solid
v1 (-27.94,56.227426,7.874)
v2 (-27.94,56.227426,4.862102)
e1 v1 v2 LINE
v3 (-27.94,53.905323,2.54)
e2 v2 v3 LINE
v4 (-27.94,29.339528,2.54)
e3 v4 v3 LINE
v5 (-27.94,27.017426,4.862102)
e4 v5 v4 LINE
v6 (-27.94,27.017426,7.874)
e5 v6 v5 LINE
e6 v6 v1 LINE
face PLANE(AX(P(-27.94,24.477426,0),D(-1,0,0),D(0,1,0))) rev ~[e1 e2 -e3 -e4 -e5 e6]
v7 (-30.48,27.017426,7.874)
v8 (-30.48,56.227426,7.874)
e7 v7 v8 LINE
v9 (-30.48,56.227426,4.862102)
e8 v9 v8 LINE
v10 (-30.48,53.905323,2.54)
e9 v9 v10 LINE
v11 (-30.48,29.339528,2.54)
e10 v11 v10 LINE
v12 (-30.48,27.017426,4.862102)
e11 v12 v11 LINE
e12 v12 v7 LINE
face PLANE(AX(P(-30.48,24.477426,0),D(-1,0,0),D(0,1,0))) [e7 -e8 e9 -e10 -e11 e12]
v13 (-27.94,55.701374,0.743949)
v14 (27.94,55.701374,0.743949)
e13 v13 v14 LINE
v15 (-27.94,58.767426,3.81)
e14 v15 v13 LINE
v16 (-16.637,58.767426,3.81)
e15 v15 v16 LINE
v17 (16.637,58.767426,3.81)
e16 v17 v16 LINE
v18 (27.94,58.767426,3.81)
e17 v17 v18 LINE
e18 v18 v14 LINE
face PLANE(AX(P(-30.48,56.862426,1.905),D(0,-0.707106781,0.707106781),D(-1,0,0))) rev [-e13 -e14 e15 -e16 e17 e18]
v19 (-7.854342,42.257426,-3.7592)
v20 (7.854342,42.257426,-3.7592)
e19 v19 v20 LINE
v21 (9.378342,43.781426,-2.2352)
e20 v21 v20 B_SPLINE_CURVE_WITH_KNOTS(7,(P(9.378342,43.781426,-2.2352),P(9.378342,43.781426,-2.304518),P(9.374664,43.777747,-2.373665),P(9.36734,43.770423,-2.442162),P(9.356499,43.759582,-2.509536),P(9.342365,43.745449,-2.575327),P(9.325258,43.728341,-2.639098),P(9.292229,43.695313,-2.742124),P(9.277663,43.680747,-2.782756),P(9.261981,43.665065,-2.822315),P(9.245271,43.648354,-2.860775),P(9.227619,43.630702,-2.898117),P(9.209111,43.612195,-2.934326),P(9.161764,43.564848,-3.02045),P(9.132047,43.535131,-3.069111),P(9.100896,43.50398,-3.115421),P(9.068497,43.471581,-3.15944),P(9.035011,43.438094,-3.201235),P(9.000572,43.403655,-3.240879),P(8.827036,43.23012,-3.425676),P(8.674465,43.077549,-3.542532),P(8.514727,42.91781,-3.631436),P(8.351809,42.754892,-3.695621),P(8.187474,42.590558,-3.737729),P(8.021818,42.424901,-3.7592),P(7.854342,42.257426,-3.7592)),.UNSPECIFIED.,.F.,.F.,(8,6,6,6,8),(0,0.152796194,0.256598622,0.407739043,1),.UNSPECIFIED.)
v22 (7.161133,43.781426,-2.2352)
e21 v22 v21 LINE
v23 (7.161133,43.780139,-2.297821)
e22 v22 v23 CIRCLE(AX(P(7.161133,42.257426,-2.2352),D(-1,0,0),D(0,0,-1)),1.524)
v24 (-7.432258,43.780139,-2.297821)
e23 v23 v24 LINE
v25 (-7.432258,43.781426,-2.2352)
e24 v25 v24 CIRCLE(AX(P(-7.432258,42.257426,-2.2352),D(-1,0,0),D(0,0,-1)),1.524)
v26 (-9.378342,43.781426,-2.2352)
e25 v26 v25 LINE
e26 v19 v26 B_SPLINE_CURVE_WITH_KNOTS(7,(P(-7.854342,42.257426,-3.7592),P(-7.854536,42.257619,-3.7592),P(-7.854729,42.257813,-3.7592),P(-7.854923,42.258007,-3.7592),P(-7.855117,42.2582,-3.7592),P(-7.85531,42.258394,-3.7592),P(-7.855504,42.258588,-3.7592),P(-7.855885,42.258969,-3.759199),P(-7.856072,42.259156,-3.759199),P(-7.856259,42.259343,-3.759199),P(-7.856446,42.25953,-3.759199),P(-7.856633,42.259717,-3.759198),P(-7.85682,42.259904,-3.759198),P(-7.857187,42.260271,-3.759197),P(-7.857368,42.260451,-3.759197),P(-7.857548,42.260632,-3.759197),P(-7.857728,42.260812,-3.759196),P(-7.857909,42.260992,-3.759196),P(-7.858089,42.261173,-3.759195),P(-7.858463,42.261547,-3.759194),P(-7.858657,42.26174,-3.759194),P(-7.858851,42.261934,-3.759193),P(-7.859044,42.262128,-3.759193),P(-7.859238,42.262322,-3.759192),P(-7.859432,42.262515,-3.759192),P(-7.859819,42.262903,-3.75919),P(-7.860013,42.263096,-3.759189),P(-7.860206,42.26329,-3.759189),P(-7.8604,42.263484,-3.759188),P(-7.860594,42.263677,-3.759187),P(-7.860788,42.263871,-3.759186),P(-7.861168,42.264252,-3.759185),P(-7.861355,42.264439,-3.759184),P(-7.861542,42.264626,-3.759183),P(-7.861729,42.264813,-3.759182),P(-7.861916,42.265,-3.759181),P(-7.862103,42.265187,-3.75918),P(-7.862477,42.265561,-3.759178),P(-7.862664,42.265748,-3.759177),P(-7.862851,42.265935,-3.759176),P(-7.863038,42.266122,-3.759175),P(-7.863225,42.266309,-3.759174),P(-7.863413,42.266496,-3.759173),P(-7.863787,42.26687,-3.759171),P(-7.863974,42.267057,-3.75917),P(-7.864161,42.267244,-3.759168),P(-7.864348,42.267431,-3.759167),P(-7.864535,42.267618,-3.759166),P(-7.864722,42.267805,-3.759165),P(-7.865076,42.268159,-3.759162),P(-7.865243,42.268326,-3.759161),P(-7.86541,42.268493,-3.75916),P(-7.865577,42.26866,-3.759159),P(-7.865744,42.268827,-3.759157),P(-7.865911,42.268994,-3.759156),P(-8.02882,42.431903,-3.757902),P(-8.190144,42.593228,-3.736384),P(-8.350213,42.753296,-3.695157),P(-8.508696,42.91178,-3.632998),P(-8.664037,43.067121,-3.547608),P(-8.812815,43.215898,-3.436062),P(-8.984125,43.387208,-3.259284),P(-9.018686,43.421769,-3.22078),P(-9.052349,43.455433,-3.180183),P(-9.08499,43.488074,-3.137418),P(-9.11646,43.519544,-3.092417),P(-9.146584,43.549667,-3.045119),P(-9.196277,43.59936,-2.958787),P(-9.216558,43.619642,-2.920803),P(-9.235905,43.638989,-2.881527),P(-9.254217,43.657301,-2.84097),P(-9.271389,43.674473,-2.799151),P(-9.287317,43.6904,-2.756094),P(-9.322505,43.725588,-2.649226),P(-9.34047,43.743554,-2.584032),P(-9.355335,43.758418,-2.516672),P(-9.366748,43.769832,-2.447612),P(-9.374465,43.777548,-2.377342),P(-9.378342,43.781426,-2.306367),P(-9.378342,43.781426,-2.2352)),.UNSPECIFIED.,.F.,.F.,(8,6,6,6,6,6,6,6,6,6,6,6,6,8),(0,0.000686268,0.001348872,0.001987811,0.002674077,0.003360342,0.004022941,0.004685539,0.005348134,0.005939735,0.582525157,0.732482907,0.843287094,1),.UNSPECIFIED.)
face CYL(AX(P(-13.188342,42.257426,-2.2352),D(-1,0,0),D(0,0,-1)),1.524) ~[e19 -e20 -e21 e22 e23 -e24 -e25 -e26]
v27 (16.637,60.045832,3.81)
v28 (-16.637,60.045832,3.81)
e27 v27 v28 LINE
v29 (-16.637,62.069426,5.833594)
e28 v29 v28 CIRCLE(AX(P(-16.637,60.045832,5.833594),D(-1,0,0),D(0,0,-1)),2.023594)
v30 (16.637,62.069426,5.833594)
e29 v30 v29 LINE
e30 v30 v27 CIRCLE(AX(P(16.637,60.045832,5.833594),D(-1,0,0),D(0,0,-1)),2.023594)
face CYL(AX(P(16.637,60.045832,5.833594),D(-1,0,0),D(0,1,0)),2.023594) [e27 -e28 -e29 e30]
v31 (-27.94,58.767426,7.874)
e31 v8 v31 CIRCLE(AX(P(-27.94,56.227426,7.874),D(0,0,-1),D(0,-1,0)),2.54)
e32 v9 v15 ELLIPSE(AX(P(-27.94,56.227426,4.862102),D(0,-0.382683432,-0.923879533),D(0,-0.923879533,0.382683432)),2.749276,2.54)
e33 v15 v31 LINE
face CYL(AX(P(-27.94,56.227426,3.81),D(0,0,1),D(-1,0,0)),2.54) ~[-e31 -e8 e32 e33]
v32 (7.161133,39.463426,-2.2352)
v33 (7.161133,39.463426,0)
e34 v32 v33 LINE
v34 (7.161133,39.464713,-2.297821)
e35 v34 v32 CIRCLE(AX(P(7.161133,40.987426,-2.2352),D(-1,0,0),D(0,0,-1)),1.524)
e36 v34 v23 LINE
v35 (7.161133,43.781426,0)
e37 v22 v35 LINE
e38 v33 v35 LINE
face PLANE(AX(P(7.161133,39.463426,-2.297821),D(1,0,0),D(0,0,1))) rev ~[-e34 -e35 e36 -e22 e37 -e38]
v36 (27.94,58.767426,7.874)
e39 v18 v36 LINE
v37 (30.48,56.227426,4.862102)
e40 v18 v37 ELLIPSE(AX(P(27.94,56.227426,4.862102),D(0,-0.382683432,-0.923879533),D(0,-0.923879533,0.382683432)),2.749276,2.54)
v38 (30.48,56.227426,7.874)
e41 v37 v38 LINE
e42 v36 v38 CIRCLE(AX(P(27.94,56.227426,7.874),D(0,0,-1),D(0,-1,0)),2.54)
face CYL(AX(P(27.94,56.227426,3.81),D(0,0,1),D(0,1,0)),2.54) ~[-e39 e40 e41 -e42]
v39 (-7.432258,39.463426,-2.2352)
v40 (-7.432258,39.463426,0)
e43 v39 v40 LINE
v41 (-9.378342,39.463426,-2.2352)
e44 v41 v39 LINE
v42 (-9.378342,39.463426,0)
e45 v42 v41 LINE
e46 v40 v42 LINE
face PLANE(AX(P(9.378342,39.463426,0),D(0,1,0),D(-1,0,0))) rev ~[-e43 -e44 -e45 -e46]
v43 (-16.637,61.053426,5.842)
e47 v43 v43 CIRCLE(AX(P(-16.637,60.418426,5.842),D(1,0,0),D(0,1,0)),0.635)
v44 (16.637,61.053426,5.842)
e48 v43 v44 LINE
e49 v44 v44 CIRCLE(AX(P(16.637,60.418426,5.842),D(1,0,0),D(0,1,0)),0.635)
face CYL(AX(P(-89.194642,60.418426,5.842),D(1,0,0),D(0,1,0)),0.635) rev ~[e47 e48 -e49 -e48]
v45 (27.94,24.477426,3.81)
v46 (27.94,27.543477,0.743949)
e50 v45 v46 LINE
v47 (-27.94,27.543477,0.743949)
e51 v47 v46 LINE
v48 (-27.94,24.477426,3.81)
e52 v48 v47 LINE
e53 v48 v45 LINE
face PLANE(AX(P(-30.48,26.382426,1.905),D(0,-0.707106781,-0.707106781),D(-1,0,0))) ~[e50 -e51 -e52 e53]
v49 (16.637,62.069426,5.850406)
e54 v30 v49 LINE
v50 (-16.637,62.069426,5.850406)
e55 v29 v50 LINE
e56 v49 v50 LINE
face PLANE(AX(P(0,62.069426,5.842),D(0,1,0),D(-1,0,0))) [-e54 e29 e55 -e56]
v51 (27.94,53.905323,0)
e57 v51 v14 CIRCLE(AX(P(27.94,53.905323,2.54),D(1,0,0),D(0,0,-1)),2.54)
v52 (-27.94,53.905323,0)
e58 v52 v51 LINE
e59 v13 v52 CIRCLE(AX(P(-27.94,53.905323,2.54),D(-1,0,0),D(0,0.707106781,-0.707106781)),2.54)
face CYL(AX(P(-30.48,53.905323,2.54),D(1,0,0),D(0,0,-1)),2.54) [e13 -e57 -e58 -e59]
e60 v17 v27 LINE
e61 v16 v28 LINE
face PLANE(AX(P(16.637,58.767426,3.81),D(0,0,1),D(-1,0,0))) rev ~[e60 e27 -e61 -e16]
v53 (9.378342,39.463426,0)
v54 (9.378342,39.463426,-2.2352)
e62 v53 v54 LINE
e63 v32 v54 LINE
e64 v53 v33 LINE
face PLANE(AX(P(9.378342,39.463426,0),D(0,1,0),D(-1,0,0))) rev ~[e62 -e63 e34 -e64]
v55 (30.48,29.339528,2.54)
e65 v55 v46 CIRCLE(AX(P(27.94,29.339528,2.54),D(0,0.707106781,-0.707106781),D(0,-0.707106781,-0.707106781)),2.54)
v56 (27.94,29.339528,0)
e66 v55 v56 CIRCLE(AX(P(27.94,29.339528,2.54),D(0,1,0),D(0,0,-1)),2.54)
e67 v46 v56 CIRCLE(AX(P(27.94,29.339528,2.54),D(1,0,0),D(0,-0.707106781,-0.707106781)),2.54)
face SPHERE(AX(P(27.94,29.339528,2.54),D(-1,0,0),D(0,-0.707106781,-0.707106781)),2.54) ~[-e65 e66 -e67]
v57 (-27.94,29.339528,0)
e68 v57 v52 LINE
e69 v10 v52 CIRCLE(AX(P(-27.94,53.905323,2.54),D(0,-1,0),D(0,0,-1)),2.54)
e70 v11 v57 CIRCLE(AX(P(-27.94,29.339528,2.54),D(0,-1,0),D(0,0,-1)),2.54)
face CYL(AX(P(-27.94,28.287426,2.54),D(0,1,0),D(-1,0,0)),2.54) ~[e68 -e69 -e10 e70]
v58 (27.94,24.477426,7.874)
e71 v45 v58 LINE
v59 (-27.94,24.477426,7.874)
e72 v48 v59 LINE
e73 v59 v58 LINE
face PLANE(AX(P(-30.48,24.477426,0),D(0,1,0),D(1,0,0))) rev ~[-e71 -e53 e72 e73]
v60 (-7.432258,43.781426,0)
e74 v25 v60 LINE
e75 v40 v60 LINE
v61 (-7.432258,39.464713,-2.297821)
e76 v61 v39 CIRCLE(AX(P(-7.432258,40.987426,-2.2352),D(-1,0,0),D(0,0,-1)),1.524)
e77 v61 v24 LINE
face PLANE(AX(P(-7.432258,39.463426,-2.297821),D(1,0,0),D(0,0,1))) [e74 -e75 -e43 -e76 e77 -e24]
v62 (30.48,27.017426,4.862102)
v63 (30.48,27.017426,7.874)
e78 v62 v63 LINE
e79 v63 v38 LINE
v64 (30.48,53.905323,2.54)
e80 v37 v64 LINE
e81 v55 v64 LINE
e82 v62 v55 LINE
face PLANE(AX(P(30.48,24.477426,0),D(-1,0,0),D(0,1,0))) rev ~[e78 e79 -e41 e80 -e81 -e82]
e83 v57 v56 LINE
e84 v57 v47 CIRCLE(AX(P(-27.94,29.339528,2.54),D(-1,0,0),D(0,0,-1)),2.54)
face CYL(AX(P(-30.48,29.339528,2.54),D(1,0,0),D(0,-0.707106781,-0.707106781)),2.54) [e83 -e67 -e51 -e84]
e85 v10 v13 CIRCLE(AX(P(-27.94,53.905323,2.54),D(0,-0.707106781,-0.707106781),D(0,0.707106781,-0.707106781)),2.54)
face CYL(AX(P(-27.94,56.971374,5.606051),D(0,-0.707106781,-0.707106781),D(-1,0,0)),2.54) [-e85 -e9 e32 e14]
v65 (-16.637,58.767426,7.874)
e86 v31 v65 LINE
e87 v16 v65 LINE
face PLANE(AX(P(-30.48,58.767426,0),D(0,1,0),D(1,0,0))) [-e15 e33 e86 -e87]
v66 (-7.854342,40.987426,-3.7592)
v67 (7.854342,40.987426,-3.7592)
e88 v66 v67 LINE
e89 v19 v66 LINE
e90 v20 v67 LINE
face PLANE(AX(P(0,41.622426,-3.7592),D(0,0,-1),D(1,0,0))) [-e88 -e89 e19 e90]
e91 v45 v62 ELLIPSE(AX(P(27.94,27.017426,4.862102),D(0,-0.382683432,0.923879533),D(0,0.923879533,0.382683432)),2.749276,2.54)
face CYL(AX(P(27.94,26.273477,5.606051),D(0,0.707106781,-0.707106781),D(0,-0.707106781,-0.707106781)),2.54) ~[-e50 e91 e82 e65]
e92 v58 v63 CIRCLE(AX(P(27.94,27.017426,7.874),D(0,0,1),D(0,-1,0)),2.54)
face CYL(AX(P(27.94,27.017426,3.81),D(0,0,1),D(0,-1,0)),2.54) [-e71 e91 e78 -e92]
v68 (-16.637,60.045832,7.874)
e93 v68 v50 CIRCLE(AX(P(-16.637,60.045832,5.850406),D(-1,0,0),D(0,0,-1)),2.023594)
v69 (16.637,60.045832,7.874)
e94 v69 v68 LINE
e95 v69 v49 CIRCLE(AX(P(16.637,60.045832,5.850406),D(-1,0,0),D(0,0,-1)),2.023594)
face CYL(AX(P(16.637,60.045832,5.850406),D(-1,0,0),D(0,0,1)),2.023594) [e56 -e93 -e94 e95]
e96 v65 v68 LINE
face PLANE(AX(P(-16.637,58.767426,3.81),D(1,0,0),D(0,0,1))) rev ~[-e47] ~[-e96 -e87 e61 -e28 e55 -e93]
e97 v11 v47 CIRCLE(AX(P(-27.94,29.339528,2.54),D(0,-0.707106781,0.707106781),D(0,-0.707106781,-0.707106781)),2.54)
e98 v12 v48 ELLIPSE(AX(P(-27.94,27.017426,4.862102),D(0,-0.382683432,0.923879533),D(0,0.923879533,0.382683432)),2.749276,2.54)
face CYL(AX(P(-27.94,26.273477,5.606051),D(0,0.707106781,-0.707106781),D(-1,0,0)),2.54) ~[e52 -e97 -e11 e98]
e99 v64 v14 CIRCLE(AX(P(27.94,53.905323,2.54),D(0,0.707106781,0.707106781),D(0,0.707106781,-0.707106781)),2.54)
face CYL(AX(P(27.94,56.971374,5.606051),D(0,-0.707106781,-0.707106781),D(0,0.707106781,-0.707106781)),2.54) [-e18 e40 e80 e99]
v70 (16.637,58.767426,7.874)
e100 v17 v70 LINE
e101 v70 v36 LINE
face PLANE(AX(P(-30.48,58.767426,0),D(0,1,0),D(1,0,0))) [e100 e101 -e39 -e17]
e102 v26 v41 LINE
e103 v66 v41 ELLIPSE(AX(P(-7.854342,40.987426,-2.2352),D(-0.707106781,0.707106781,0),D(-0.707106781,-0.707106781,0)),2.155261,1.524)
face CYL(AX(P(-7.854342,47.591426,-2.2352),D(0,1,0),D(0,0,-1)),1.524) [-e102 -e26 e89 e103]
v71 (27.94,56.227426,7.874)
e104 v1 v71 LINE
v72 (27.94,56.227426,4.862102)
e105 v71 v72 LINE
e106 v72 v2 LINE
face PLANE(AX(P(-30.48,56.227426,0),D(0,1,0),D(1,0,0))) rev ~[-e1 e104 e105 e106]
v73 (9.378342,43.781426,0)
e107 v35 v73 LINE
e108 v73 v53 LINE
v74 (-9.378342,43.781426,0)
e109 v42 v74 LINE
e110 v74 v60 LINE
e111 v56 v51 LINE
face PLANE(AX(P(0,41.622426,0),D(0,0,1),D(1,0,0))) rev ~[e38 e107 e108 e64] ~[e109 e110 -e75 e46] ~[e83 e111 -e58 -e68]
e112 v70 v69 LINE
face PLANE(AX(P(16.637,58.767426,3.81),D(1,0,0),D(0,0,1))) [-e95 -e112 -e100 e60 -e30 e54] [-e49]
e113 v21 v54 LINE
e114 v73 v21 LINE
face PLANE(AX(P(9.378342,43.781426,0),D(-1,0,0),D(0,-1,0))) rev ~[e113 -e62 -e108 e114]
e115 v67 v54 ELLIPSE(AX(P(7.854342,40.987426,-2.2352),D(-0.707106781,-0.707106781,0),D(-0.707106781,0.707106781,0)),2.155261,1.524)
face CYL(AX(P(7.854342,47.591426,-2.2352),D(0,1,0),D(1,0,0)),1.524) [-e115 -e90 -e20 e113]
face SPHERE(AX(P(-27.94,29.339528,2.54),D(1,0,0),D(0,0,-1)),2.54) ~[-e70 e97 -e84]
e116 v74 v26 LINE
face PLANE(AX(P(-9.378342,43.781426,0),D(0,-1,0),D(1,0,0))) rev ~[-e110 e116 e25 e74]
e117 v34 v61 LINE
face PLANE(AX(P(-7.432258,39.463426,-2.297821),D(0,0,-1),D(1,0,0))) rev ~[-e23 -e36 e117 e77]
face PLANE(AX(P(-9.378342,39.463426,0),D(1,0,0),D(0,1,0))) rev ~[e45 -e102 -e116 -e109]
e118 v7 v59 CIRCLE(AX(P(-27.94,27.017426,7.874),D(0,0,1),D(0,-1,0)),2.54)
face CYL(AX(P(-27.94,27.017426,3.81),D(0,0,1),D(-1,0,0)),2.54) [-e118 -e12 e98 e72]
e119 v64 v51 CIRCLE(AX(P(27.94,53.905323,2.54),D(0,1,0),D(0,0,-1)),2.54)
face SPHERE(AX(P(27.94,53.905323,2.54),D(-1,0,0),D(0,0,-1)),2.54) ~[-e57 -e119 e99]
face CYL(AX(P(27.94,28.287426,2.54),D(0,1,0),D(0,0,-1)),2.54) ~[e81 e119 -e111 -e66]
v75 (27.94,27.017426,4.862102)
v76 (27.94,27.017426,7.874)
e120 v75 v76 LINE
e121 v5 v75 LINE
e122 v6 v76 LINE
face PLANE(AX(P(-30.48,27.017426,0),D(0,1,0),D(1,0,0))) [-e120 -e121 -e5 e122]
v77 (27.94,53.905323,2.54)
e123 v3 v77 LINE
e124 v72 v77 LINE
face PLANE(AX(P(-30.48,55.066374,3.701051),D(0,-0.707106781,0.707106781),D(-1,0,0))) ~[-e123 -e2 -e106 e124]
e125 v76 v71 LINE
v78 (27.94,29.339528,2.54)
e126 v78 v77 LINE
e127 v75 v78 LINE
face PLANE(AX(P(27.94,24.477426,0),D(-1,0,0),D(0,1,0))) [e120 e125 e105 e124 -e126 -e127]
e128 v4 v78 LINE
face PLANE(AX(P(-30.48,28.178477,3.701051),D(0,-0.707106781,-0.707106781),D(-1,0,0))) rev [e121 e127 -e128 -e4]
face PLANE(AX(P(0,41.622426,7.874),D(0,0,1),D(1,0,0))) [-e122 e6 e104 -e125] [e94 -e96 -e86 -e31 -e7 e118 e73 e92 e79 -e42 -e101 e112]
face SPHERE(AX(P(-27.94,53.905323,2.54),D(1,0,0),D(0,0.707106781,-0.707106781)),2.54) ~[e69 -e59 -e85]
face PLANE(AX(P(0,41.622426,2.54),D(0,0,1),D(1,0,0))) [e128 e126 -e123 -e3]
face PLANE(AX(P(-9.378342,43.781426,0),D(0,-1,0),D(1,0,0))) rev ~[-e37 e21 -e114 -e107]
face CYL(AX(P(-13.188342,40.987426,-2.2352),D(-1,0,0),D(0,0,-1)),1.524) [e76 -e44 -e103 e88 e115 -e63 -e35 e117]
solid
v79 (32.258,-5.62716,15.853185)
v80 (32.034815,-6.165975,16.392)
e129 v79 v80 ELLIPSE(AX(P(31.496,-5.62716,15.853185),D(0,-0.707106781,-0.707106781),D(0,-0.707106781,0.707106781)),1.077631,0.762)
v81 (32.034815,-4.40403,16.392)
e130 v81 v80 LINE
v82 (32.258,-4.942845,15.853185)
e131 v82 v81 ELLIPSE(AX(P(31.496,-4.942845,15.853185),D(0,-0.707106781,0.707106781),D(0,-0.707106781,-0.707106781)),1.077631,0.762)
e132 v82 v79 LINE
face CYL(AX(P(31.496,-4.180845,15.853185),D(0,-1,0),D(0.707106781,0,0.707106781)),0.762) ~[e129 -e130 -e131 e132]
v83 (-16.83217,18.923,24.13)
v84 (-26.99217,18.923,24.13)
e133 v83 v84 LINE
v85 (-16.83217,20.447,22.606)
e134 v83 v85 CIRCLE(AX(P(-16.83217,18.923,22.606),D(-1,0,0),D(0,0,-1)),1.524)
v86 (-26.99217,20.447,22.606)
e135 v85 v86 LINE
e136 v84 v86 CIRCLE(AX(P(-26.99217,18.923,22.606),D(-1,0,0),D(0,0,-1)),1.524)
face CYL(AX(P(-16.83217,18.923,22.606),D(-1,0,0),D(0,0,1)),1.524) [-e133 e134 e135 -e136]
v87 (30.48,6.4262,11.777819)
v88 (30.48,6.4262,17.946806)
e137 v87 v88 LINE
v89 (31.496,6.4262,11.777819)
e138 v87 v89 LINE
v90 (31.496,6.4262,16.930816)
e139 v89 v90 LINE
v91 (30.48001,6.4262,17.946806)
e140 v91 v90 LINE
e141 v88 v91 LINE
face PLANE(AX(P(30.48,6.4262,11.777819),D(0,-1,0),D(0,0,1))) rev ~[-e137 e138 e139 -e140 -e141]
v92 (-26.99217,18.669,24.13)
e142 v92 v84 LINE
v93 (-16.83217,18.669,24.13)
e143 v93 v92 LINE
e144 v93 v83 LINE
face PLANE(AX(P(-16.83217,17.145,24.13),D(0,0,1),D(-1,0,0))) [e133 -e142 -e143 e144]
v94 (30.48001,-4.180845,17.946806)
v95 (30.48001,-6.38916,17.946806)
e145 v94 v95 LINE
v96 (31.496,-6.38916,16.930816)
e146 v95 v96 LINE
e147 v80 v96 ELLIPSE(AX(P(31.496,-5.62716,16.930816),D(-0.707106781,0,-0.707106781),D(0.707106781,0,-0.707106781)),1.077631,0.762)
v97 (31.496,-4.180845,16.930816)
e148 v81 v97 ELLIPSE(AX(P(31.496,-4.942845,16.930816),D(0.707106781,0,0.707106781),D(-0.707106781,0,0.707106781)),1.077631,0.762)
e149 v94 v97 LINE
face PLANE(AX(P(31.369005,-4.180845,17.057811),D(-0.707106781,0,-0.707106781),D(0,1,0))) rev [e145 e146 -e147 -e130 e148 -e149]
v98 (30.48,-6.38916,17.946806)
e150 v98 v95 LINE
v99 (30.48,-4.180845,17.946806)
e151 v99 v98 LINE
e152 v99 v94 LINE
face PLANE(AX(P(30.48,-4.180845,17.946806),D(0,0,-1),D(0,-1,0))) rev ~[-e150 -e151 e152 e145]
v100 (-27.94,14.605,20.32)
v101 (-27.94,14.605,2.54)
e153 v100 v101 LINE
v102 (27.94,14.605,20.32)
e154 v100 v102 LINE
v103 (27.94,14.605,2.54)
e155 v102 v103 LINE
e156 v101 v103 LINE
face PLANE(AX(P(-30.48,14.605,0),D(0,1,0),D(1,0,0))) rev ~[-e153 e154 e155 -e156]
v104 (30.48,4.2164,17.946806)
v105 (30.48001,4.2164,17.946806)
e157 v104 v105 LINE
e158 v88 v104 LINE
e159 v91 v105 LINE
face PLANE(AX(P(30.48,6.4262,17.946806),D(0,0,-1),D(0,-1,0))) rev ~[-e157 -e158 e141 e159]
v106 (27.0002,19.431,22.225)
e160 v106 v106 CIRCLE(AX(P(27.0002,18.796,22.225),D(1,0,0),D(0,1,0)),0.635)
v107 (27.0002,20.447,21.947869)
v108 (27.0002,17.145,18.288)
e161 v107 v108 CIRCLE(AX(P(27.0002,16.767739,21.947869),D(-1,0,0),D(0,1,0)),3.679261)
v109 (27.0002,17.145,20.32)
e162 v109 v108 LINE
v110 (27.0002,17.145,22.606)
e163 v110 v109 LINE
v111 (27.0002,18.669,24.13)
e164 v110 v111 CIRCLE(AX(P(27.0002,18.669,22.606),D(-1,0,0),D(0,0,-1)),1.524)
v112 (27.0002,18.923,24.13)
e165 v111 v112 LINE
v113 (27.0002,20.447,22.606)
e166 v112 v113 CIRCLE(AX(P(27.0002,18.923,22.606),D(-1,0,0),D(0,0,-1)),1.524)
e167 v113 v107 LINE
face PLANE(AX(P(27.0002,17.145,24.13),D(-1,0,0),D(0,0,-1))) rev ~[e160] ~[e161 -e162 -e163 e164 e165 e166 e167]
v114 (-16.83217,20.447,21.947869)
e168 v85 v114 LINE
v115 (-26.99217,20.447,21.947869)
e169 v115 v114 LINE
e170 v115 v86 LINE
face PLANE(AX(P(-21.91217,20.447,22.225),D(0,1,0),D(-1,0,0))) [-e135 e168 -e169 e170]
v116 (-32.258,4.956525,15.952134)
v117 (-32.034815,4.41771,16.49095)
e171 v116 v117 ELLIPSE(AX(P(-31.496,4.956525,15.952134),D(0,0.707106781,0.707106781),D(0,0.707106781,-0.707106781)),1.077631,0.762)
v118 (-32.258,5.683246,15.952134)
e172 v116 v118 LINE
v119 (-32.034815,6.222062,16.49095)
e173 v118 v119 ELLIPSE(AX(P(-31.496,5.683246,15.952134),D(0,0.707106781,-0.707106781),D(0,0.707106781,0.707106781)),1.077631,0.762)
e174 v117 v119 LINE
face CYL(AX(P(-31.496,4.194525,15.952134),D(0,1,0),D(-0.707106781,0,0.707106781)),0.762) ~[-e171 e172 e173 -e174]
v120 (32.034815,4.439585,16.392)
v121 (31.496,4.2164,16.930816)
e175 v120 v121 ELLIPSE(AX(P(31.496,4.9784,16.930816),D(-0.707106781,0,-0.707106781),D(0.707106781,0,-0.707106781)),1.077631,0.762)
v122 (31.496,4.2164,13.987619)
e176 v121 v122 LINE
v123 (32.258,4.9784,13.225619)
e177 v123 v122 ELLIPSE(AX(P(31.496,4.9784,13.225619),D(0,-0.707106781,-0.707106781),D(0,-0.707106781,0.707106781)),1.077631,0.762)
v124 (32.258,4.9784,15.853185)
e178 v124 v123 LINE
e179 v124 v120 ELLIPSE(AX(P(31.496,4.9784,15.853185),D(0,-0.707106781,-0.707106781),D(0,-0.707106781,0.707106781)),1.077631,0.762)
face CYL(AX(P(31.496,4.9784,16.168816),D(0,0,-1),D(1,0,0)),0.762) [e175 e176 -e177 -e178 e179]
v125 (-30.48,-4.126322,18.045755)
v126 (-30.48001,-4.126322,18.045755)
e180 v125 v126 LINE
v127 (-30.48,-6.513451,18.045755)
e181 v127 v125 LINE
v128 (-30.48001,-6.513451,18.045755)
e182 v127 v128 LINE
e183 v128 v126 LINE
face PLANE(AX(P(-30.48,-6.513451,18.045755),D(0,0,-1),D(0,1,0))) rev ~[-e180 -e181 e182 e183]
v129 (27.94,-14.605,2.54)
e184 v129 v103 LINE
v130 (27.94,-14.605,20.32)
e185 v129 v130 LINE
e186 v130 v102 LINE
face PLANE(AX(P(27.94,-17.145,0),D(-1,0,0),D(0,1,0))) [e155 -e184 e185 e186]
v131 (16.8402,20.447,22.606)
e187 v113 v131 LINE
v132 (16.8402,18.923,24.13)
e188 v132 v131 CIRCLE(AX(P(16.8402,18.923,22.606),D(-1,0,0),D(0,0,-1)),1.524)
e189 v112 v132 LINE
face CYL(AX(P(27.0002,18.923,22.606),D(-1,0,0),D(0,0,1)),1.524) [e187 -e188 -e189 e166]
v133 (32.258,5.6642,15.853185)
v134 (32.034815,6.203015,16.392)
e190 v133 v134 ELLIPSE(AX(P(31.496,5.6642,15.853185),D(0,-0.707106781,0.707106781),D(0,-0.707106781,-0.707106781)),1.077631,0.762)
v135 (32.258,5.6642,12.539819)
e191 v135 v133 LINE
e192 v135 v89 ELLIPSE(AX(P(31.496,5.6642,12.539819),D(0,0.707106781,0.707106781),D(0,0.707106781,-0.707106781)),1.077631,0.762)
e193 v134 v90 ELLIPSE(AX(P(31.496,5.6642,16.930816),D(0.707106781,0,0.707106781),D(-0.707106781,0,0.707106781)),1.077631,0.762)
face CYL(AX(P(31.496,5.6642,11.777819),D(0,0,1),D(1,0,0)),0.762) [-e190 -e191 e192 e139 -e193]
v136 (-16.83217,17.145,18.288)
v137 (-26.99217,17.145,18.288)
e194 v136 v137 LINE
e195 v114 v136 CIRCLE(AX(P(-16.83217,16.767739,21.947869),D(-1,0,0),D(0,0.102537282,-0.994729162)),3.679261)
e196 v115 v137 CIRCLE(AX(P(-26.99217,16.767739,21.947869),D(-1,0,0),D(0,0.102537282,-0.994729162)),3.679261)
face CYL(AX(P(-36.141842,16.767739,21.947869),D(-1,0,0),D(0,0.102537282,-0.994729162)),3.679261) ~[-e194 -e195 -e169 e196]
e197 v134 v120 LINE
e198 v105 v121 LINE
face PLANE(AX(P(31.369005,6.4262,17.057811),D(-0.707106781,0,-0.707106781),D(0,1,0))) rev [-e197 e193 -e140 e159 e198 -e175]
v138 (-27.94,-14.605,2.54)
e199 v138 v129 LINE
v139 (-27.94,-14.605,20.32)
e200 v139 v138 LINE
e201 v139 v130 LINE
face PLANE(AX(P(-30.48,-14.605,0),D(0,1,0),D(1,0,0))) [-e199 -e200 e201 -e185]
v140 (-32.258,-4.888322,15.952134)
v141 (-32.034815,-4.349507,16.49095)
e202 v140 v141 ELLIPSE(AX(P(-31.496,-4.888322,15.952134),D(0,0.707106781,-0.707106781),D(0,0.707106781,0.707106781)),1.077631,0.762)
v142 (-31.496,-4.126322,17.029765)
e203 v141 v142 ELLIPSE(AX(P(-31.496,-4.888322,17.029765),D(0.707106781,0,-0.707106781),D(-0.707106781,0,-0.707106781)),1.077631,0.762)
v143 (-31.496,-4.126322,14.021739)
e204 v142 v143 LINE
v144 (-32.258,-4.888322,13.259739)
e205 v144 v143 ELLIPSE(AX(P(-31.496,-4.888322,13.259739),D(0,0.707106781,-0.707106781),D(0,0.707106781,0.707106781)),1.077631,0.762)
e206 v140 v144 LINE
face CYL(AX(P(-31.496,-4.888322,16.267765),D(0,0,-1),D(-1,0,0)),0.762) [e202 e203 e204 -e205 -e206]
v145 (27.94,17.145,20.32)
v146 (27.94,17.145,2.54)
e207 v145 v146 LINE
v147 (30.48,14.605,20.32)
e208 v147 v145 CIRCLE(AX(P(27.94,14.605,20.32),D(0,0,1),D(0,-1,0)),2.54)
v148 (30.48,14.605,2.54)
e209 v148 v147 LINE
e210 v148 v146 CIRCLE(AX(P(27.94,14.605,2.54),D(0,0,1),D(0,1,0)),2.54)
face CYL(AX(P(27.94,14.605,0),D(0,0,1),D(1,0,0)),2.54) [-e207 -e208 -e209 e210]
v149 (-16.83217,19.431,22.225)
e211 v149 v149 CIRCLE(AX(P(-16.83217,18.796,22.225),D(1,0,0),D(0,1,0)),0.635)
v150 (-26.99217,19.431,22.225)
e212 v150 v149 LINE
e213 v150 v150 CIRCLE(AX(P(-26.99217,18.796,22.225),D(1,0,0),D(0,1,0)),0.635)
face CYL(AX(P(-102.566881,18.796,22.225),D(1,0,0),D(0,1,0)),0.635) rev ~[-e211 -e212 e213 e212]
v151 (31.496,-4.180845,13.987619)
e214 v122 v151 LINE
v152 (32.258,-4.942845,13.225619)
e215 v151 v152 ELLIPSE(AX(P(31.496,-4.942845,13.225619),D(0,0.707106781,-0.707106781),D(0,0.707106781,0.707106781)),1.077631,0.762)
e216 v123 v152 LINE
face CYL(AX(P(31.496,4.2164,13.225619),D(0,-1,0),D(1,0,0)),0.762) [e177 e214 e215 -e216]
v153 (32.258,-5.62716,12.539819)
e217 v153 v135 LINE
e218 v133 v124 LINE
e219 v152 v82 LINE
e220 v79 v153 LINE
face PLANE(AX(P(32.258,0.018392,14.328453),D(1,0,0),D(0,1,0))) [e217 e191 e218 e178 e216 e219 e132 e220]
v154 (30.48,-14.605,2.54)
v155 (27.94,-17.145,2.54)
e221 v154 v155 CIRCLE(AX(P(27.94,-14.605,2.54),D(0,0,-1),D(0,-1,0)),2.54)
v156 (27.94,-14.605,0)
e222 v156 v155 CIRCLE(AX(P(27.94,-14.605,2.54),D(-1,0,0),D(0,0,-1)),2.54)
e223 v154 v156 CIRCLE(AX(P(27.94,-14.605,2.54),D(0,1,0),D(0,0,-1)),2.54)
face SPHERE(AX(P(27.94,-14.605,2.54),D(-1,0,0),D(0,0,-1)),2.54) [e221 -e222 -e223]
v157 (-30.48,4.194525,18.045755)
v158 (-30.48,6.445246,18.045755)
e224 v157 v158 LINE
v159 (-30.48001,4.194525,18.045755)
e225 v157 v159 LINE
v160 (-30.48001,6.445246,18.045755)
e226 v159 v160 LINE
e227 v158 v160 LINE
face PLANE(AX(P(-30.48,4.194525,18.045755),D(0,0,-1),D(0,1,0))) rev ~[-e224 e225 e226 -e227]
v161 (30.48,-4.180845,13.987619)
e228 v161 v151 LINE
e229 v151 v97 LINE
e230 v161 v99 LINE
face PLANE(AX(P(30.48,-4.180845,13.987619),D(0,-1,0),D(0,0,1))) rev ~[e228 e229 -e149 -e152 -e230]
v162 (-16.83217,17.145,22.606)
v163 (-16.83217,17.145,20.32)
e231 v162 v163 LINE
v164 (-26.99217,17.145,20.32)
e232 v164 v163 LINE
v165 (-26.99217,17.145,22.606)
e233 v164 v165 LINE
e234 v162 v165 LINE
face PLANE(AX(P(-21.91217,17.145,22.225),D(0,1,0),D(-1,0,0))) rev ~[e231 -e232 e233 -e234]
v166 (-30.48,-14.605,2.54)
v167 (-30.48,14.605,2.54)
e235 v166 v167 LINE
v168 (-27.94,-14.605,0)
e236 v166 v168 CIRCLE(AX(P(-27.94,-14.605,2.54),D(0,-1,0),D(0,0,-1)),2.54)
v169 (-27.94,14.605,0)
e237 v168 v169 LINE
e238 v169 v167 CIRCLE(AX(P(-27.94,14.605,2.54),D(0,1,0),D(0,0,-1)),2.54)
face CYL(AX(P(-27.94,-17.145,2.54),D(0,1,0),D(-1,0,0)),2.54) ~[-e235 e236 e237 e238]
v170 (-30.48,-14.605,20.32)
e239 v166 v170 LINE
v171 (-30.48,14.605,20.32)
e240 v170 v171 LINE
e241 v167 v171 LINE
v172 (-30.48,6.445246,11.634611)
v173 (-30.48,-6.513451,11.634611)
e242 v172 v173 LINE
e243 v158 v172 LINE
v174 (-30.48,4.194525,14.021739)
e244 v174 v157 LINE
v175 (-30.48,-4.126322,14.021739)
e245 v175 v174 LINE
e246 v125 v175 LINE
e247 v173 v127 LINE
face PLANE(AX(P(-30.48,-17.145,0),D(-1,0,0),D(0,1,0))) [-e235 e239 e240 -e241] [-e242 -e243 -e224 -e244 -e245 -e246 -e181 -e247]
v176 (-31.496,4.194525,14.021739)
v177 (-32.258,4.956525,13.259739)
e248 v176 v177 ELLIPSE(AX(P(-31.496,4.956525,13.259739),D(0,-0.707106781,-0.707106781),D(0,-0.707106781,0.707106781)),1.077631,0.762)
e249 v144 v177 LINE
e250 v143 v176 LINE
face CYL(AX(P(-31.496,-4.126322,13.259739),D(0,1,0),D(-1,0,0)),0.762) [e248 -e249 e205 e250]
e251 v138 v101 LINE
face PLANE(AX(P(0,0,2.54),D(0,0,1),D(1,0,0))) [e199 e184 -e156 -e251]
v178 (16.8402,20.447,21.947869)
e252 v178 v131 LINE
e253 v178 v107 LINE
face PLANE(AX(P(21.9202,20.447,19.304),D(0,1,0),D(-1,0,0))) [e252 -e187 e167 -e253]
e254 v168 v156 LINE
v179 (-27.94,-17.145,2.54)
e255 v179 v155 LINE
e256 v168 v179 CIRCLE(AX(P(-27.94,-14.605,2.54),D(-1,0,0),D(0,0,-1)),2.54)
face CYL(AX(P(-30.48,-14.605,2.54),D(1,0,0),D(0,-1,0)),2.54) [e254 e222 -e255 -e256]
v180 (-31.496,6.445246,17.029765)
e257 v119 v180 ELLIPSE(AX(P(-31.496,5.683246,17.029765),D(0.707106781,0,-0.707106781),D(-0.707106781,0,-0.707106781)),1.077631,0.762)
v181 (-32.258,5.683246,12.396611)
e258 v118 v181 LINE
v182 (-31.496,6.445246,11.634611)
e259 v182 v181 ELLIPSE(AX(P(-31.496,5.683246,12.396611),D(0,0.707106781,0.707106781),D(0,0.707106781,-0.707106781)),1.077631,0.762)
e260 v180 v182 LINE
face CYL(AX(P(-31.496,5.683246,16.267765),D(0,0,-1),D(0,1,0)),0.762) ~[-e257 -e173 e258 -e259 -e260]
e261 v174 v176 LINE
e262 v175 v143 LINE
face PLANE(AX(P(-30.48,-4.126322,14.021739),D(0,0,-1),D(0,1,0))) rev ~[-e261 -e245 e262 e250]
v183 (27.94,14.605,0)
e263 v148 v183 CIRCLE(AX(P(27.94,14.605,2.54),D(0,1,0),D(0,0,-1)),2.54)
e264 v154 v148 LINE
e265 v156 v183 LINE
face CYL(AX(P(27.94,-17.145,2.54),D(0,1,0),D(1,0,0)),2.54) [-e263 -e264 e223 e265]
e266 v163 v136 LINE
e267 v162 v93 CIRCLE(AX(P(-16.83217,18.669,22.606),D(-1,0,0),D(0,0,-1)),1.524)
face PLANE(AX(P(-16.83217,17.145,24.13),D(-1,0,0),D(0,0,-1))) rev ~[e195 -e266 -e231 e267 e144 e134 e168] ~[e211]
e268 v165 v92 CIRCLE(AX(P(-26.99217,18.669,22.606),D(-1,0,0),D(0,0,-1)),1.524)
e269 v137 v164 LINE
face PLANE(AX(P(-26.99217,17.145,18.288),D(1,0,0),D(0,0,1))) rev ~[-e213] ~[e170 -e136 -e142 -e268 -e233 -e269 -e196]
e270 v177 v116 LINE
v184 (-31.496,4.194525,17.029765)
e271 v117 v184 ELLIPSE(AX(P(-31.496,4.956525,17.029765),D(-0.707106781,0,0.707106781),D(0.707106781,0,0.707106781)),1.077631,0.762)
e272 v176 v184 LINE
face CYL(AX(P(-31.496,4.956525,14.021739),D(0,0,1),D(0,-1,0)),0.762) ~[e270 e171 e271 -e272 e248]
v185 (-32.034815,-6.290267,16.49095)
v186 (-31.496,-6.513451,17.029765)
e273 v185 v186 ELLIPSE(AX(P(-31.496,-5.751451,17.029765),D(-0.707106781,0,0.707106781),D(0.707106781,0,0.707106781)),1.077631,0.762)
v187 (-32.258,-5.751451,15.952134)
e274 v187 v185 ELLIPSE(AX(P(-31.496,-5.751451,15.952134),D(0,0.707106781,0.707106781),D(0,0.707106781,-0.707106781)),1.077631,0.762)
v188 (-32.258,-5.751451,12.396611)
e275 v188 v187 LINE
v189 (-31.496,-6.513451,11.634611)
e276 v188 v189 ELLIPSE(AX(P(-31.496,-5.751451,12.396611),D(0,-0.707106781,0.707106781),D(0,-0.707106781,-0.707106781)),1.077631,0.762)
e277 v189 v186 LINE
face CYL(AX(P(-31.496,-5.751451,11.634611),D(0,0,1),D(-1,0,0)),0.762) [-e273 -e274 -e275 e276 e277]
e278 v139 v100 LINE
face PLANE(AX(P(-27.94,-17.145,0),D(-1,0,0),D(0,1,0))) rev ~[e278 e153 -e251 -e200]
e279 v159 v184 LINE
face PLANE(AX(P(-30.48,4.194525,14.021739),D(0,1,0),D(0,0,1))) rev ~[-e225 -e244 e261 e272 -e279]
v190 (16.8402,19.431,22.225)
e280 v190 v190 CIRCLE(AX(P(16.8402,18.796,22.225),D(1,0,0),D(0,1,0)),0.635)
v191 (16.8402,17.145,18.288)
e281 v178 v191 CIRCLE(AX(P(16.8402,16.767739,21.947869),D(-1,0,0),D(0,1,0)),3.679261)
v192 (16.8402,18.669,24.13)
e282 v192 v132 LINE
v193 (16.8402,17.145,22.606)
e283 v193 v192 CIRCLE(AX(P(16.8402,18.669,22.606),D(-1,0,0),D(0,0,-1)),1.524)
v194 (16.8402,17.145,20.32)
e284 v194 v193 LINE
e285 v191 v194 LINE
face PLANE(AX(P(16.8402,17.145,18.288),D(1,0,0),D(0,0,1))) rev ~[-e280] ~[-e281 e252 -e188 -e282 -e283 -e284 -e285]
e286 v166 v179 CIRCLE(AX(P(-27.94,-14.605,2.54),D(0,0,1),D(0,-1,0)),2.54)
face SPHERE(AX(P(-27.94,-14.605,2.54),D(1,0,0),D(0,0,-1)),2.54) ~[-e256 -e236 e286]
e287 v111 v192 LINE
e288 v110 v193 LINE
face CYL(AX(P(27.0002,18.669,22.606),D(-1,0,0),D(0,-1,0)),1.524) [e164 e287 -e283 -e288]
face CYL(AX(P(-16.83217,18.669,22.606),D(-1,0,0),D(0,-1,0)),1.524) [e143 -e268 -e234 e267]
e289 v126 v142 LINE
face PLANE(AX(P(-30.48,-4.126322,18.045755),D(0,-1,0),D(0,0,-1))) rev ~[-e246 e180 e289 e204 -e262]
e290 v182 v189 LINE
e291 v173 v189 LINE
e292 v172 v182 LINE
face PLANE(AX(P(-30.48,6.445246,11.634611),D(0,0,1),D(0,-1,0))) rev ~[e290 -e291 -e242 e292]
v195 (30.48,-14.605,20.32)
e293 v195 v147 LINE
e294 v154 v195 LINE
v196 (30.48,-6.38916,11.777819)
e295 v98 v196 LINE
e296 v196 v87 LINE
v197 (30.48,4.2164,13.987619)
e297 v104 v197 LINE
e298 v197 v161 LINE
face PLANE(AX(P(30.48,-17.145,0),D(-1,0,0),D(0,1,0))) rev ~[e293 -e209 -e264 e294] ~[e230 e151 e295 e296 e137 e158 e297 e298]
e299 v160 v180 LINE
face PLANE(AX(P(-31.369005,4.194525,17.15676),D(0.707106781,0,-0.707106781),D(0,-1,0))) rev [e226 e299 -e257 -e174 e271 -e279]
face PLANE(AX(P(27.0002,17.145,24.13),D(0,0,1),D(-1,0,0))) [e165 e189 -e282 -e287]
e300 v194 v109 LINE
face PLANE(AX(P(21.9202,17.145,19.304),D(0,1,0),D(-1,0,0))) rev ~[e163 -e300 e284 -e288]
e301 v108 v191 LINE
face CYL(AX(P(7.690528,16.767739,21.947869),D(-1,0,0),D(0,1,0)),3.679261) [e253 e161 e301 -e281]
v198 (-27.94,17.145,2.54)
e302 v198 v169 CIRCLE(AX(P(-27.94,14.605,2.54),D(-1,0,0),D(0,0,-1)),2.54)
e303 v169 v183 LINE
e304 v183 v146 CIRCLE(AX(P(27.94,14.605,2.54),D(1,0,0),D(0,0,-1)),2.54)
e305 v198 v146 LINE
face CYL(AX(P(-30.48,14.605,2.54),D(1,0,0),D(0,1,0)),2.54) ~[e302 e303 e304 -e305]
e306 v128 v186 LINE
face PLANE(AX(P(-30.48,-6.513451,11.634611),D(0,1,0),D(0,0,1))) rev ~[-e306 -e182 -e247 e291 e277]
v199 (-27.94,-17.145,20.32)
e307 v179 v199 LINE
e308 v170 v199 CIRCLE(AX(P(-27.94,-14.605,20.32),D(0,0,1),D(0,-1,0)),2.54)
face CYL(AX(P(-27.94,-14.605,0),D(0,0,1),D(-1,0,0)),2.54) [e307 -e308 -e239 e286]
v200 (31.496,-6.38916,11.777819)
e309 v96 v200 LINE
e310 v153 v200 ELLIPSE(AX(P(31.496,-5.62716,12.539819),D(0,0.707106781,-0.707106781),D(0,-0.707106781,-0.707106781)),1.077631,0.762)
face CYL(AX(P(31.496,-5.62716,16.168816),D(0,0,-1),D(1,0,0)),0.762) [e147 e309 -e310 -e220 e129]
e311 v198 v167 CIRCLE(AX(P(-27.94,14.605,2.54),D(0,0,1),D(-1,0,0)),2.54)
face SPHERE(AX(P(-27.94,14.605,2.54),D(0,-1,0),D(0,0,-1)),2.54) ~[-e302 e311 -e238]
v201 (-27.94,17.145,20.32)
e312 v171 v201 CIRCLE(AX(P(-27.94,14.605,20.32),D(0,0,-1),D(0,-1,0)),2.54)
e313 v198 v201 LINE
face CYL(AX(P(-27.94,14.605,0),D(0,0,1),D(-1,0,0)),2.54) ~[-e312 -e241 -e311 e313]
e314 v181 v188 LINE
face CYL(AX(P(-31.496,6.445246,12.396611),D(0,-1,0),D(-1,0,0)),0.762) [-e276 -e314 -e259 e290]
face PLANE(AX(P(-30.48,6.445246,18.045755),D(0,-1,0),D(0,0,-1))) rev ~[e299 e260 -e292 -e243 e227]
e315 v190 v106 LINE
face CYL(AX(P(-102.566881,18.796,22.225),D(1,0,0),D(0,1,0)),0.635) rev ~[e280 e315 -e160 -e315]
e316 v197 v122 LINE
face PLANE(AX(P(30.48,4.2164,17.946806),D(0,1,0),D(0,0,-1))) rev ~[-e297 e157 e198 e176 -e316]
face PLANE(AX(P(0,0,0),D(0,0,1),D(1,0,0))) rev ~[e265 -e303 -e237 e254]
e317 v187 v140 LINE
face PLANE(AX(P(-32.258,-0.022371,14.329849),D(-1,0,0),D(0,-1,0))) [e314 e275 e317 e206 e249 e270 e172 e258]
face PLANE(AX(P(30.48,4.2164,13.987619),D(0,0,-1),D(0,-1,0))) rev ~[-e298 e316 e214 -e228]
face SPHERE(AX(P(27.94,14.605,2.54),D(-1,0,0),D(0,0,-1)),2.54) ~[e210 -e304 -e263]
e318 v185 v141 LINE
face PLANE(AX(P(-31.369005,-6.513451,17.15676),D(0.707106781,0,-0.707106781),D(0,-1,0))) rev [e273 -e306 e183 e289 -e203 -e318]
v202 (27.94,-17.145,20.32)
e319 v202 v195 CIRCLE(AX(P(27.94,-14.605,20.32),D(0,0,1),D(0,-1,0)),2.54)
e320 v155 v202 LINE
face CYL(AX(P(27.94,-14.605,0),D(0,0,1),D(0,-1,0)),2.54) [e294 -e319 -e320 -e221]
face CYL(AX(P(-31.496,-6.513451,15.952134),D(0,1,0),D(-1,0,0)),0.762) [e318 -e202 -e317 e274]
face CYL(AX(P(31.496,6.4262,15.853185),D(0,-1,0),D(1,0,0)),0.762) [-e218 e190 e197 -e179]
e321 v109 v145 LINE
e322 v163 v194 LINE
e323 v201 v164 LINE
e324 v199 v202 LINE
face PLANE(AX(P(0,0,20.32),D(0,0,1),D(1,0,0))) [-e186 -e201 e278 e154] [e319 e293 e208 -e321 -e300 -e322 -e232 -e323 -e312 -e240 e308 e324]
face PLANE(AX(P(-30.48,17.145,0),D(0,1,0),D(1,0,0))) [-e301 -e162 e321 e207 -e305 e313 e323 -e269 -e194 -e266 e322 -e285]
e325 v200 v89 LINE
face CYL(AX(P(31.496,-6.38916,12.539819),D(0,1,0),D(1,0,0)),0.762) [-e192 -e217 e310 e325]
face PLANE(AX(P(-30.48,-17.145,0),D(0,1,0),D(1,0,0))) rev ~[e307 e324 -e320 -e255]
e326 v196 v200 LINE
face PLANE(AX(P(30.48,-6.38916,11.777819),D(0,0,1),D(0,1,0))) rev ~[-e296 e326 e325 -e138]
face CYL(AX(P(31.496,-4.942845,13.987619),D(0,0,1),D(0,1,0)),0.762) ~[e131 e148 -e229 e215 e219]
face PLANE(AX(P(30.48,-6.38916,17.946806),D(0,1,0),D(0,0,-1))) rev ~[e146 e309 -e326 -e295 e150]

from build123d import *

# Parameters (mm, degrees)
F0_W           = 60.96
F0_H           = 34.29
F1_DEPTH       = 20.32
F2_T           = -2.54
F3_R           = 2.54
F4_W           = 60.96
F4_H           = 34.29
F5_DEPTH       = 7.874
F6_SIZE        = 3.81
F7_T           = -2.54
F8_W           = 10.16
F8_H           = 3.81
F8_H_2         = 2.032
F9_DEPTH       = 3.302
F10_R          = 2.54
F12_D          = 1.27
F14_DEPTH      = 3.7592
F15_W          = 14.5933912136
F15_H          = 2.2978205234
F16_DEPTH      = 25.4
F17_F1_R       = 1.524
F17_F2_R       = 1.524
F17_F3_R       = 1.524
F17_F4_R       = 1.524
F17_2_T1_DEPTH = 26.3766839159
F17_2_T3_DEPTH = 11.938
F19_T1_DEPTH   = 28.459343391
F19_T3_DEPTH   = 28.459343391
F18_W          = 33.274
F18_H          = 4.064
F20_DEPTH      = 3.302
F22_D          = 1.27
F23_R          = 2.023593808
F26_DEPTH      = 1.778
F27_SIZE       = 1.77799
F28_R          = 0.762
F29_DEPTH      = 1.778
F30_SIZE       = 1.77799
F31_R          = 0.762


# Not quite as in the source:
# - a fillet or chamfer that OpenCascade refuses, or shapes differently, is made with other operations: its cross-section is extruded or revolved along the edge and cut away or added
# - a fillet or chamfer is up to 0.001 mm smaller than in the source, because OpenCascade refuses the exact size


with BuildPart() as f1:
    # F0 (on Top) → F1 (new body)
    with BuildSketch(Plane.XY):
        Rectangle(F0_W, F0_H)
    extrude(amount=F1_DEPTH)

    # F2
    f2_openings = [f1.faces().sort_by_distance(p)[0] for p in [
        (0, 0, 20.32),
    ]]
    offset(amount=F2_T, openings=f2_openings)

    # F3
    f3_edges = [f1.edges().sort_by_distance(p)[0] for p in [
        (0, -17.145, 0),
        (-30.48, 0, 0),
        (0, 17.145, 0),
        (30.48, 0, 0),
        (-30.48, -17.145, 10.16),
        (-30.48, 17.145, 10.16),
        (30.48, 17.145, 10.16),
        (30.48, -17.145, 10.16),
    ]]
    fillet(f3_edges, radius=F3_R)

    # F8 (on face) → F9 (join)
    with BuildSketch(Plane(origin=(0, 17.145, 0), x_dir=(-1, 0, 0), z_dir=(0, 1, 0))):
        with Locations((21.9121703571, 22.225)):
            Rectangle(F8_W, F8_H)
        with Locations((21.9121703571, 19.304)):
            Rectangle(F8_W, F8_H_2)
        with Locations((-21.9202, 19.304)):
            Rectangle(F8_W, F8_H_2)
        with Locations((-21.9202, 22.225)):
            Rectangle(F8_W, F8_H)
    extrude(amount=F9_DEPTH)

    # F12 (through all)
    with Locations(Plane(origin=(-26.9921703571, 0, 0), x_dir=(0, -1, 0), z_dir=(-1, 0, 0))):
        with Locations((-18.796, 22.225)):
            Hole(F12_D / 2)

    # F17: fillet of radius 1.524 on 4 edges, made by hand

    # F17_f1
    f17_f1_edges = [f1.edges().sort_by_distance(p)[0] for p in [
        (21.9202, 17.145, 24.13),
    ]]
    fillet(f17_f1_edges, radius=F17_F1_R)

    # F17_f2
    f17_f2_edges = [f1.edges().sort_by_distance(p)[0] for p in [
        (-21.9121703571, 17.145, 24.13),
    ]]
    fillet(f17_f2_edges, radius=F17_F2_R)

    # F17_f3
    f17_f3_edges = [f1.edges().sort_by_distance(p)[0] for p in [
        (-21.9121703571, 20.447, 24.13),
    ]]
    fillet(f17_f3_edges, radius=F17_F3_R)

    # F17_f4
    f17_f4_edges = [f1.edges().sort_by_distance(p)[0] for p in [
        (21.9202, 20.447, 24.13),
    ]]
    fillet(f17_f4_edges, radius=F17_F4_R)

    # F19: fillet of radius 3.6792614691 on 2 edges, made by hand

    # F19_s2 → F19_t1 (cut)
    with BuildSketch(Plane.YZ.offset(-36.1418420526)):
        with BuildLine():
            ThreePointArc((17.145, 18.288), (19.4994969888, 19.4832265773), (20.447, 21.9478686782))
            Line((20.447, 21.9478686782), (20.447, 18.288))
            Line((20.447, 18.288), (17.145, 18.288))
        make_face()
    extrude(amount=F19_T1_DEPTH, mode=Mode.SUBTRACT)

    # F19_s4 → F19_t3 (cut)
    with BuildSketch(Plane.YZ.offset(7.6905283045)):
        with BuildLine():
            ThreePointArc((20.447, 21.9478686782), (19.4994969888, 19.4832265773), (17.145, 18.288))
            Line((17.145, 18.288), (20.447, 18.288))
            Line((20.447, 18.288), (20.447, 21.9478686782))
        make_face()
    extrude(amount=F19_T3_DEPTH, mode=Mode.SUBTRACT)

    # F25 (on face) → F26 (join)
    with BuildSketch(Plane(origin=(-30.48, 0, 0), x_dir=(0, -1, 0), z_dir=(-1, 0, 0))):
        Polygon((-4.1945250705, 18.0457551032), (-6.445246283, 18.0457551032), (-6.445246283, 11.6346105933), (6.5134512261, 11.6346105933), (6.5134512261, 18.0457551032), (4.12632199, 18.0457551032), (4.12632199, 14.0217393637), (-4.1945250705, 14.0217393637), align=None)
    extrude(amount=F26_DEPTH)

    # F27 (size 1.778 in the source; OpenCascade refuses exactly that, so slightly less here)
    f27_edges = [f1.edges().sort_by_distance(p)[0] for p in [
        (-32.258, 5.319886, 18.045755),
        (-32.258, -5.319887, 18.045755),
    ]]
    chamfer(f27_edges, length=F27_SIZE)

    # F28
    f28_edges = [f1.edges().sort_by_distance(p)[0] for p in [
        (-32.258, 6.445246, 13.951188),
        (-32.258, 5.319886, 16.267765),
        (-32.258, -0.034102, 11.634611),
        (-32.258, 4.194525, 15.144752),
        (-32.258, -6.513451, 13.951188),
        (-32.258, 0.034102, 14.021739),
        (-32.258, -5.319887, 16.267765),
        (-32.258, -4.126322, 15.144752),
    ]]
    fillet(f28_edges, radius=F28_R)

    # F24 (on face) → F29 (join)
    with BuildSketch(Plane.YZ.offset(30.48)):
        Polygon((-4.1808448732, 17.946805805), (-6.3891597092, 17.946805805), (-6.3891597092, 11.7778191343), (6.4262, 11.7778191343), (6.4262, 17.946805805), (4.2164, 17.946805805), (4.2164, 13.9876191343), (-4.1808448732, 13.9876191343), align=None)
    extrude(amount=F29_DEPTH)

    # F30 (size 1.778 in the source; OpenCascade refuses exactly that, so slightly less here)
    f30_edges = [f1.edges().sort_by_distance(p)[0] for p in [
        (32.258, -5.285002, 17.946806),
        (32.258, 5.3213, 17.946806),
    ]]
    chamfer(f30_edges, length=F30_SIZE)

    # F31
    f31_edges = [f1.edges().sort_by_distance(p)[0] for p in [
        (32.258, -6.38916, 13.973317),
        (32.258, -5.285002, 16.168816),
        (32.258, 0.01852, 11.777819),
        (32.258, -4.180845, 15.078217),
        (32.258, 6.4262, 13.973317),
        (32.258, 0.017778, 13.987619),
        (32.258, 5.3213, 16.168816),
        (32.258, 4.2164, 15.078217),
    ]]
    fillet(f31_edges, radius=F31_R)


with BuildPart() as f5:
    # F4 (on Top) → F5 (new body)
    with BuildSketch(Plane.XY):
        with Locations((0, 41.6224255873)):
            Rectangle(F4_W, F4_H)
    extrude(amount=F5_DEPTH)

    # F6
    f6_edges = [f5.edges().sort_by_distance(p)[0] for p in [
        (0, 58.767426, 0),
        (0, 24.477426, 0),
    ]]
    chamfer(f6_edges, length=F6_SIZE)

    # F7
    f7_openings = [f5.faces().sort_by_distance(p)[0] for p in [
        (0, 41.622426, 7.874),
    ]]
    offset(amount=F7_T, openings=f7_openings)

    # F10
    f10_edges = [f5.edges().sort_by_distance(p)[0] for p in [
        (0, 54.957426, 0),
        (0, 28.287426, 0),
        (30.48, 26.382426, 1.905),
        (30.48, 41.622426, 0),
        (30.48, 56.862426, 1.905),
        (-30.48, 56.862426, 1.905),
        (-30.48, 41.622426, 0),
        (-30.48, 58.767426, 5.842),
        (-30.48, 26.382426, 1.905),
        (-30.48, 24.477426, 5.842),
        (30.48, 24.477426, 5.842),
        (30.48, 58.767426, 5.842),
    ]]
    fillet(f10_edges, radius=F10_R)

    # F13 (on face) → F14 (join)
    with BuildSketch(Plane(origin=(0, 0, 0), x_dir=(1, 0, 0), z_dir=(0, 0, -1))):
        Polygon((-9.3783419579, -43.7814255873), (0, -43.7814255873), (9.3783419579, -43.7814255873), (9.3783419579, -39.4634255873), (-9.3783419579, -39.4634255873), align=None)
    extrude(amount=F14_DEPTH)

    # F15 (on face) → F16 (cut)
    with BuildSketch(Plane.XZ.offset(-39.4634255873)):
        with Locations((-0.1355621498, -1.1489102617)):
            Rectangle(F15_W, F15_H)
    extrude(amount=-F16_DEPTH, mode=Mode.SUBTRACT)

    # F17#2: fillet of radius 1.524 on 4 edges, made by hand

    # F17_2_s2 → F17_2_t1 (cut)
    with BuildSketch(Plane.YZ.offset(-13.1883419579)):
        with BuildLine():
            ThreePointArc((42.2574255873, -3.7592), (43.3350563218, -3.3128307345), (43.7814255873, -2.2352))
            Line((43.7814255873, -2.2352), (43.7814255873, -3.7592))
            Line((43.7814255873, -3.7592), (42.2574255873, -3.7592))
        make_face()
        with BuildLine():
            ThreePointArc((40.9874255873, -3.7592), (39.9097948527, -3.3128307345), (39.4634255873, -2.2352))
            Line((39.4634255873, -2.2352), (39.4634255873, -3.7592))
            Line((39.4634255873, -3.7592), (40.9874255873, -3.7592))
        make_face()
    extrude(amount=F17_2_T1_DEPTH, mode=Mode.SUBTRACT)

    # F17_2_s4 → F17_2_t3 (cut)
    with BuildSketch(Plane.XZ.offset(-47.5914255873)):
        with BuildLine():
            ThreePointArc((9.3783419579, -2.2352), (8.9319726925, -3.3128307345), (7.8543419579, -3.7592))
            Line((7.8543419579, -3.7592), (9.3783419579, -3.7592))
            Line((9.3783419579, -3.7592), (9.3783419579, -2.2352))
        make_face()
        with BuildLine():
            ThreePointArc((-7.8543419579, -3.7592), (-8.9319726925, -3.3128307345), (-9.3783419579, -2.2352))
            Line((-9.3783419579, -2.2352), (-9.3783419579, -3.7592))
            Line((-9.3783419579, -3.7592), (-7.8543419579, -3.7592))
        make_face()
    extrude(amount=F17_2_T3_DEPTH, mode=Mode.SUBTRACT)

    # F18 (on face) → F20 (join)
    with BuildSketch(Plane(origin=(0, 58.7674255873, 0), x_dir=(-1, 0, 0), z_dir=(0, 1, 0))):
        with Locations((0, 5.842)):
            Rectangle(F18_W, F18_H)
    extrude(amount=F20_DEPTH)

    # F22 (through all)
    with Locations(Plane(origin=(-16.637, 0, 0), x_dir=(0, -1, 0), z_dir=(-1, 0, 0))):
        with Locations((-60.4184255873, 5.842)):
            Hole(F22_D / 2)

    # F23
    f23_edges = [f5.edges().sort_by_distance(p)[0] for p in [
        (0, 62.069426, 7.874),
        (0, 62.069426, 3.81),
    ]]
    fillet(f23_edges, radius=F23_R)


solid = Compound([f1.part, f5.part])
